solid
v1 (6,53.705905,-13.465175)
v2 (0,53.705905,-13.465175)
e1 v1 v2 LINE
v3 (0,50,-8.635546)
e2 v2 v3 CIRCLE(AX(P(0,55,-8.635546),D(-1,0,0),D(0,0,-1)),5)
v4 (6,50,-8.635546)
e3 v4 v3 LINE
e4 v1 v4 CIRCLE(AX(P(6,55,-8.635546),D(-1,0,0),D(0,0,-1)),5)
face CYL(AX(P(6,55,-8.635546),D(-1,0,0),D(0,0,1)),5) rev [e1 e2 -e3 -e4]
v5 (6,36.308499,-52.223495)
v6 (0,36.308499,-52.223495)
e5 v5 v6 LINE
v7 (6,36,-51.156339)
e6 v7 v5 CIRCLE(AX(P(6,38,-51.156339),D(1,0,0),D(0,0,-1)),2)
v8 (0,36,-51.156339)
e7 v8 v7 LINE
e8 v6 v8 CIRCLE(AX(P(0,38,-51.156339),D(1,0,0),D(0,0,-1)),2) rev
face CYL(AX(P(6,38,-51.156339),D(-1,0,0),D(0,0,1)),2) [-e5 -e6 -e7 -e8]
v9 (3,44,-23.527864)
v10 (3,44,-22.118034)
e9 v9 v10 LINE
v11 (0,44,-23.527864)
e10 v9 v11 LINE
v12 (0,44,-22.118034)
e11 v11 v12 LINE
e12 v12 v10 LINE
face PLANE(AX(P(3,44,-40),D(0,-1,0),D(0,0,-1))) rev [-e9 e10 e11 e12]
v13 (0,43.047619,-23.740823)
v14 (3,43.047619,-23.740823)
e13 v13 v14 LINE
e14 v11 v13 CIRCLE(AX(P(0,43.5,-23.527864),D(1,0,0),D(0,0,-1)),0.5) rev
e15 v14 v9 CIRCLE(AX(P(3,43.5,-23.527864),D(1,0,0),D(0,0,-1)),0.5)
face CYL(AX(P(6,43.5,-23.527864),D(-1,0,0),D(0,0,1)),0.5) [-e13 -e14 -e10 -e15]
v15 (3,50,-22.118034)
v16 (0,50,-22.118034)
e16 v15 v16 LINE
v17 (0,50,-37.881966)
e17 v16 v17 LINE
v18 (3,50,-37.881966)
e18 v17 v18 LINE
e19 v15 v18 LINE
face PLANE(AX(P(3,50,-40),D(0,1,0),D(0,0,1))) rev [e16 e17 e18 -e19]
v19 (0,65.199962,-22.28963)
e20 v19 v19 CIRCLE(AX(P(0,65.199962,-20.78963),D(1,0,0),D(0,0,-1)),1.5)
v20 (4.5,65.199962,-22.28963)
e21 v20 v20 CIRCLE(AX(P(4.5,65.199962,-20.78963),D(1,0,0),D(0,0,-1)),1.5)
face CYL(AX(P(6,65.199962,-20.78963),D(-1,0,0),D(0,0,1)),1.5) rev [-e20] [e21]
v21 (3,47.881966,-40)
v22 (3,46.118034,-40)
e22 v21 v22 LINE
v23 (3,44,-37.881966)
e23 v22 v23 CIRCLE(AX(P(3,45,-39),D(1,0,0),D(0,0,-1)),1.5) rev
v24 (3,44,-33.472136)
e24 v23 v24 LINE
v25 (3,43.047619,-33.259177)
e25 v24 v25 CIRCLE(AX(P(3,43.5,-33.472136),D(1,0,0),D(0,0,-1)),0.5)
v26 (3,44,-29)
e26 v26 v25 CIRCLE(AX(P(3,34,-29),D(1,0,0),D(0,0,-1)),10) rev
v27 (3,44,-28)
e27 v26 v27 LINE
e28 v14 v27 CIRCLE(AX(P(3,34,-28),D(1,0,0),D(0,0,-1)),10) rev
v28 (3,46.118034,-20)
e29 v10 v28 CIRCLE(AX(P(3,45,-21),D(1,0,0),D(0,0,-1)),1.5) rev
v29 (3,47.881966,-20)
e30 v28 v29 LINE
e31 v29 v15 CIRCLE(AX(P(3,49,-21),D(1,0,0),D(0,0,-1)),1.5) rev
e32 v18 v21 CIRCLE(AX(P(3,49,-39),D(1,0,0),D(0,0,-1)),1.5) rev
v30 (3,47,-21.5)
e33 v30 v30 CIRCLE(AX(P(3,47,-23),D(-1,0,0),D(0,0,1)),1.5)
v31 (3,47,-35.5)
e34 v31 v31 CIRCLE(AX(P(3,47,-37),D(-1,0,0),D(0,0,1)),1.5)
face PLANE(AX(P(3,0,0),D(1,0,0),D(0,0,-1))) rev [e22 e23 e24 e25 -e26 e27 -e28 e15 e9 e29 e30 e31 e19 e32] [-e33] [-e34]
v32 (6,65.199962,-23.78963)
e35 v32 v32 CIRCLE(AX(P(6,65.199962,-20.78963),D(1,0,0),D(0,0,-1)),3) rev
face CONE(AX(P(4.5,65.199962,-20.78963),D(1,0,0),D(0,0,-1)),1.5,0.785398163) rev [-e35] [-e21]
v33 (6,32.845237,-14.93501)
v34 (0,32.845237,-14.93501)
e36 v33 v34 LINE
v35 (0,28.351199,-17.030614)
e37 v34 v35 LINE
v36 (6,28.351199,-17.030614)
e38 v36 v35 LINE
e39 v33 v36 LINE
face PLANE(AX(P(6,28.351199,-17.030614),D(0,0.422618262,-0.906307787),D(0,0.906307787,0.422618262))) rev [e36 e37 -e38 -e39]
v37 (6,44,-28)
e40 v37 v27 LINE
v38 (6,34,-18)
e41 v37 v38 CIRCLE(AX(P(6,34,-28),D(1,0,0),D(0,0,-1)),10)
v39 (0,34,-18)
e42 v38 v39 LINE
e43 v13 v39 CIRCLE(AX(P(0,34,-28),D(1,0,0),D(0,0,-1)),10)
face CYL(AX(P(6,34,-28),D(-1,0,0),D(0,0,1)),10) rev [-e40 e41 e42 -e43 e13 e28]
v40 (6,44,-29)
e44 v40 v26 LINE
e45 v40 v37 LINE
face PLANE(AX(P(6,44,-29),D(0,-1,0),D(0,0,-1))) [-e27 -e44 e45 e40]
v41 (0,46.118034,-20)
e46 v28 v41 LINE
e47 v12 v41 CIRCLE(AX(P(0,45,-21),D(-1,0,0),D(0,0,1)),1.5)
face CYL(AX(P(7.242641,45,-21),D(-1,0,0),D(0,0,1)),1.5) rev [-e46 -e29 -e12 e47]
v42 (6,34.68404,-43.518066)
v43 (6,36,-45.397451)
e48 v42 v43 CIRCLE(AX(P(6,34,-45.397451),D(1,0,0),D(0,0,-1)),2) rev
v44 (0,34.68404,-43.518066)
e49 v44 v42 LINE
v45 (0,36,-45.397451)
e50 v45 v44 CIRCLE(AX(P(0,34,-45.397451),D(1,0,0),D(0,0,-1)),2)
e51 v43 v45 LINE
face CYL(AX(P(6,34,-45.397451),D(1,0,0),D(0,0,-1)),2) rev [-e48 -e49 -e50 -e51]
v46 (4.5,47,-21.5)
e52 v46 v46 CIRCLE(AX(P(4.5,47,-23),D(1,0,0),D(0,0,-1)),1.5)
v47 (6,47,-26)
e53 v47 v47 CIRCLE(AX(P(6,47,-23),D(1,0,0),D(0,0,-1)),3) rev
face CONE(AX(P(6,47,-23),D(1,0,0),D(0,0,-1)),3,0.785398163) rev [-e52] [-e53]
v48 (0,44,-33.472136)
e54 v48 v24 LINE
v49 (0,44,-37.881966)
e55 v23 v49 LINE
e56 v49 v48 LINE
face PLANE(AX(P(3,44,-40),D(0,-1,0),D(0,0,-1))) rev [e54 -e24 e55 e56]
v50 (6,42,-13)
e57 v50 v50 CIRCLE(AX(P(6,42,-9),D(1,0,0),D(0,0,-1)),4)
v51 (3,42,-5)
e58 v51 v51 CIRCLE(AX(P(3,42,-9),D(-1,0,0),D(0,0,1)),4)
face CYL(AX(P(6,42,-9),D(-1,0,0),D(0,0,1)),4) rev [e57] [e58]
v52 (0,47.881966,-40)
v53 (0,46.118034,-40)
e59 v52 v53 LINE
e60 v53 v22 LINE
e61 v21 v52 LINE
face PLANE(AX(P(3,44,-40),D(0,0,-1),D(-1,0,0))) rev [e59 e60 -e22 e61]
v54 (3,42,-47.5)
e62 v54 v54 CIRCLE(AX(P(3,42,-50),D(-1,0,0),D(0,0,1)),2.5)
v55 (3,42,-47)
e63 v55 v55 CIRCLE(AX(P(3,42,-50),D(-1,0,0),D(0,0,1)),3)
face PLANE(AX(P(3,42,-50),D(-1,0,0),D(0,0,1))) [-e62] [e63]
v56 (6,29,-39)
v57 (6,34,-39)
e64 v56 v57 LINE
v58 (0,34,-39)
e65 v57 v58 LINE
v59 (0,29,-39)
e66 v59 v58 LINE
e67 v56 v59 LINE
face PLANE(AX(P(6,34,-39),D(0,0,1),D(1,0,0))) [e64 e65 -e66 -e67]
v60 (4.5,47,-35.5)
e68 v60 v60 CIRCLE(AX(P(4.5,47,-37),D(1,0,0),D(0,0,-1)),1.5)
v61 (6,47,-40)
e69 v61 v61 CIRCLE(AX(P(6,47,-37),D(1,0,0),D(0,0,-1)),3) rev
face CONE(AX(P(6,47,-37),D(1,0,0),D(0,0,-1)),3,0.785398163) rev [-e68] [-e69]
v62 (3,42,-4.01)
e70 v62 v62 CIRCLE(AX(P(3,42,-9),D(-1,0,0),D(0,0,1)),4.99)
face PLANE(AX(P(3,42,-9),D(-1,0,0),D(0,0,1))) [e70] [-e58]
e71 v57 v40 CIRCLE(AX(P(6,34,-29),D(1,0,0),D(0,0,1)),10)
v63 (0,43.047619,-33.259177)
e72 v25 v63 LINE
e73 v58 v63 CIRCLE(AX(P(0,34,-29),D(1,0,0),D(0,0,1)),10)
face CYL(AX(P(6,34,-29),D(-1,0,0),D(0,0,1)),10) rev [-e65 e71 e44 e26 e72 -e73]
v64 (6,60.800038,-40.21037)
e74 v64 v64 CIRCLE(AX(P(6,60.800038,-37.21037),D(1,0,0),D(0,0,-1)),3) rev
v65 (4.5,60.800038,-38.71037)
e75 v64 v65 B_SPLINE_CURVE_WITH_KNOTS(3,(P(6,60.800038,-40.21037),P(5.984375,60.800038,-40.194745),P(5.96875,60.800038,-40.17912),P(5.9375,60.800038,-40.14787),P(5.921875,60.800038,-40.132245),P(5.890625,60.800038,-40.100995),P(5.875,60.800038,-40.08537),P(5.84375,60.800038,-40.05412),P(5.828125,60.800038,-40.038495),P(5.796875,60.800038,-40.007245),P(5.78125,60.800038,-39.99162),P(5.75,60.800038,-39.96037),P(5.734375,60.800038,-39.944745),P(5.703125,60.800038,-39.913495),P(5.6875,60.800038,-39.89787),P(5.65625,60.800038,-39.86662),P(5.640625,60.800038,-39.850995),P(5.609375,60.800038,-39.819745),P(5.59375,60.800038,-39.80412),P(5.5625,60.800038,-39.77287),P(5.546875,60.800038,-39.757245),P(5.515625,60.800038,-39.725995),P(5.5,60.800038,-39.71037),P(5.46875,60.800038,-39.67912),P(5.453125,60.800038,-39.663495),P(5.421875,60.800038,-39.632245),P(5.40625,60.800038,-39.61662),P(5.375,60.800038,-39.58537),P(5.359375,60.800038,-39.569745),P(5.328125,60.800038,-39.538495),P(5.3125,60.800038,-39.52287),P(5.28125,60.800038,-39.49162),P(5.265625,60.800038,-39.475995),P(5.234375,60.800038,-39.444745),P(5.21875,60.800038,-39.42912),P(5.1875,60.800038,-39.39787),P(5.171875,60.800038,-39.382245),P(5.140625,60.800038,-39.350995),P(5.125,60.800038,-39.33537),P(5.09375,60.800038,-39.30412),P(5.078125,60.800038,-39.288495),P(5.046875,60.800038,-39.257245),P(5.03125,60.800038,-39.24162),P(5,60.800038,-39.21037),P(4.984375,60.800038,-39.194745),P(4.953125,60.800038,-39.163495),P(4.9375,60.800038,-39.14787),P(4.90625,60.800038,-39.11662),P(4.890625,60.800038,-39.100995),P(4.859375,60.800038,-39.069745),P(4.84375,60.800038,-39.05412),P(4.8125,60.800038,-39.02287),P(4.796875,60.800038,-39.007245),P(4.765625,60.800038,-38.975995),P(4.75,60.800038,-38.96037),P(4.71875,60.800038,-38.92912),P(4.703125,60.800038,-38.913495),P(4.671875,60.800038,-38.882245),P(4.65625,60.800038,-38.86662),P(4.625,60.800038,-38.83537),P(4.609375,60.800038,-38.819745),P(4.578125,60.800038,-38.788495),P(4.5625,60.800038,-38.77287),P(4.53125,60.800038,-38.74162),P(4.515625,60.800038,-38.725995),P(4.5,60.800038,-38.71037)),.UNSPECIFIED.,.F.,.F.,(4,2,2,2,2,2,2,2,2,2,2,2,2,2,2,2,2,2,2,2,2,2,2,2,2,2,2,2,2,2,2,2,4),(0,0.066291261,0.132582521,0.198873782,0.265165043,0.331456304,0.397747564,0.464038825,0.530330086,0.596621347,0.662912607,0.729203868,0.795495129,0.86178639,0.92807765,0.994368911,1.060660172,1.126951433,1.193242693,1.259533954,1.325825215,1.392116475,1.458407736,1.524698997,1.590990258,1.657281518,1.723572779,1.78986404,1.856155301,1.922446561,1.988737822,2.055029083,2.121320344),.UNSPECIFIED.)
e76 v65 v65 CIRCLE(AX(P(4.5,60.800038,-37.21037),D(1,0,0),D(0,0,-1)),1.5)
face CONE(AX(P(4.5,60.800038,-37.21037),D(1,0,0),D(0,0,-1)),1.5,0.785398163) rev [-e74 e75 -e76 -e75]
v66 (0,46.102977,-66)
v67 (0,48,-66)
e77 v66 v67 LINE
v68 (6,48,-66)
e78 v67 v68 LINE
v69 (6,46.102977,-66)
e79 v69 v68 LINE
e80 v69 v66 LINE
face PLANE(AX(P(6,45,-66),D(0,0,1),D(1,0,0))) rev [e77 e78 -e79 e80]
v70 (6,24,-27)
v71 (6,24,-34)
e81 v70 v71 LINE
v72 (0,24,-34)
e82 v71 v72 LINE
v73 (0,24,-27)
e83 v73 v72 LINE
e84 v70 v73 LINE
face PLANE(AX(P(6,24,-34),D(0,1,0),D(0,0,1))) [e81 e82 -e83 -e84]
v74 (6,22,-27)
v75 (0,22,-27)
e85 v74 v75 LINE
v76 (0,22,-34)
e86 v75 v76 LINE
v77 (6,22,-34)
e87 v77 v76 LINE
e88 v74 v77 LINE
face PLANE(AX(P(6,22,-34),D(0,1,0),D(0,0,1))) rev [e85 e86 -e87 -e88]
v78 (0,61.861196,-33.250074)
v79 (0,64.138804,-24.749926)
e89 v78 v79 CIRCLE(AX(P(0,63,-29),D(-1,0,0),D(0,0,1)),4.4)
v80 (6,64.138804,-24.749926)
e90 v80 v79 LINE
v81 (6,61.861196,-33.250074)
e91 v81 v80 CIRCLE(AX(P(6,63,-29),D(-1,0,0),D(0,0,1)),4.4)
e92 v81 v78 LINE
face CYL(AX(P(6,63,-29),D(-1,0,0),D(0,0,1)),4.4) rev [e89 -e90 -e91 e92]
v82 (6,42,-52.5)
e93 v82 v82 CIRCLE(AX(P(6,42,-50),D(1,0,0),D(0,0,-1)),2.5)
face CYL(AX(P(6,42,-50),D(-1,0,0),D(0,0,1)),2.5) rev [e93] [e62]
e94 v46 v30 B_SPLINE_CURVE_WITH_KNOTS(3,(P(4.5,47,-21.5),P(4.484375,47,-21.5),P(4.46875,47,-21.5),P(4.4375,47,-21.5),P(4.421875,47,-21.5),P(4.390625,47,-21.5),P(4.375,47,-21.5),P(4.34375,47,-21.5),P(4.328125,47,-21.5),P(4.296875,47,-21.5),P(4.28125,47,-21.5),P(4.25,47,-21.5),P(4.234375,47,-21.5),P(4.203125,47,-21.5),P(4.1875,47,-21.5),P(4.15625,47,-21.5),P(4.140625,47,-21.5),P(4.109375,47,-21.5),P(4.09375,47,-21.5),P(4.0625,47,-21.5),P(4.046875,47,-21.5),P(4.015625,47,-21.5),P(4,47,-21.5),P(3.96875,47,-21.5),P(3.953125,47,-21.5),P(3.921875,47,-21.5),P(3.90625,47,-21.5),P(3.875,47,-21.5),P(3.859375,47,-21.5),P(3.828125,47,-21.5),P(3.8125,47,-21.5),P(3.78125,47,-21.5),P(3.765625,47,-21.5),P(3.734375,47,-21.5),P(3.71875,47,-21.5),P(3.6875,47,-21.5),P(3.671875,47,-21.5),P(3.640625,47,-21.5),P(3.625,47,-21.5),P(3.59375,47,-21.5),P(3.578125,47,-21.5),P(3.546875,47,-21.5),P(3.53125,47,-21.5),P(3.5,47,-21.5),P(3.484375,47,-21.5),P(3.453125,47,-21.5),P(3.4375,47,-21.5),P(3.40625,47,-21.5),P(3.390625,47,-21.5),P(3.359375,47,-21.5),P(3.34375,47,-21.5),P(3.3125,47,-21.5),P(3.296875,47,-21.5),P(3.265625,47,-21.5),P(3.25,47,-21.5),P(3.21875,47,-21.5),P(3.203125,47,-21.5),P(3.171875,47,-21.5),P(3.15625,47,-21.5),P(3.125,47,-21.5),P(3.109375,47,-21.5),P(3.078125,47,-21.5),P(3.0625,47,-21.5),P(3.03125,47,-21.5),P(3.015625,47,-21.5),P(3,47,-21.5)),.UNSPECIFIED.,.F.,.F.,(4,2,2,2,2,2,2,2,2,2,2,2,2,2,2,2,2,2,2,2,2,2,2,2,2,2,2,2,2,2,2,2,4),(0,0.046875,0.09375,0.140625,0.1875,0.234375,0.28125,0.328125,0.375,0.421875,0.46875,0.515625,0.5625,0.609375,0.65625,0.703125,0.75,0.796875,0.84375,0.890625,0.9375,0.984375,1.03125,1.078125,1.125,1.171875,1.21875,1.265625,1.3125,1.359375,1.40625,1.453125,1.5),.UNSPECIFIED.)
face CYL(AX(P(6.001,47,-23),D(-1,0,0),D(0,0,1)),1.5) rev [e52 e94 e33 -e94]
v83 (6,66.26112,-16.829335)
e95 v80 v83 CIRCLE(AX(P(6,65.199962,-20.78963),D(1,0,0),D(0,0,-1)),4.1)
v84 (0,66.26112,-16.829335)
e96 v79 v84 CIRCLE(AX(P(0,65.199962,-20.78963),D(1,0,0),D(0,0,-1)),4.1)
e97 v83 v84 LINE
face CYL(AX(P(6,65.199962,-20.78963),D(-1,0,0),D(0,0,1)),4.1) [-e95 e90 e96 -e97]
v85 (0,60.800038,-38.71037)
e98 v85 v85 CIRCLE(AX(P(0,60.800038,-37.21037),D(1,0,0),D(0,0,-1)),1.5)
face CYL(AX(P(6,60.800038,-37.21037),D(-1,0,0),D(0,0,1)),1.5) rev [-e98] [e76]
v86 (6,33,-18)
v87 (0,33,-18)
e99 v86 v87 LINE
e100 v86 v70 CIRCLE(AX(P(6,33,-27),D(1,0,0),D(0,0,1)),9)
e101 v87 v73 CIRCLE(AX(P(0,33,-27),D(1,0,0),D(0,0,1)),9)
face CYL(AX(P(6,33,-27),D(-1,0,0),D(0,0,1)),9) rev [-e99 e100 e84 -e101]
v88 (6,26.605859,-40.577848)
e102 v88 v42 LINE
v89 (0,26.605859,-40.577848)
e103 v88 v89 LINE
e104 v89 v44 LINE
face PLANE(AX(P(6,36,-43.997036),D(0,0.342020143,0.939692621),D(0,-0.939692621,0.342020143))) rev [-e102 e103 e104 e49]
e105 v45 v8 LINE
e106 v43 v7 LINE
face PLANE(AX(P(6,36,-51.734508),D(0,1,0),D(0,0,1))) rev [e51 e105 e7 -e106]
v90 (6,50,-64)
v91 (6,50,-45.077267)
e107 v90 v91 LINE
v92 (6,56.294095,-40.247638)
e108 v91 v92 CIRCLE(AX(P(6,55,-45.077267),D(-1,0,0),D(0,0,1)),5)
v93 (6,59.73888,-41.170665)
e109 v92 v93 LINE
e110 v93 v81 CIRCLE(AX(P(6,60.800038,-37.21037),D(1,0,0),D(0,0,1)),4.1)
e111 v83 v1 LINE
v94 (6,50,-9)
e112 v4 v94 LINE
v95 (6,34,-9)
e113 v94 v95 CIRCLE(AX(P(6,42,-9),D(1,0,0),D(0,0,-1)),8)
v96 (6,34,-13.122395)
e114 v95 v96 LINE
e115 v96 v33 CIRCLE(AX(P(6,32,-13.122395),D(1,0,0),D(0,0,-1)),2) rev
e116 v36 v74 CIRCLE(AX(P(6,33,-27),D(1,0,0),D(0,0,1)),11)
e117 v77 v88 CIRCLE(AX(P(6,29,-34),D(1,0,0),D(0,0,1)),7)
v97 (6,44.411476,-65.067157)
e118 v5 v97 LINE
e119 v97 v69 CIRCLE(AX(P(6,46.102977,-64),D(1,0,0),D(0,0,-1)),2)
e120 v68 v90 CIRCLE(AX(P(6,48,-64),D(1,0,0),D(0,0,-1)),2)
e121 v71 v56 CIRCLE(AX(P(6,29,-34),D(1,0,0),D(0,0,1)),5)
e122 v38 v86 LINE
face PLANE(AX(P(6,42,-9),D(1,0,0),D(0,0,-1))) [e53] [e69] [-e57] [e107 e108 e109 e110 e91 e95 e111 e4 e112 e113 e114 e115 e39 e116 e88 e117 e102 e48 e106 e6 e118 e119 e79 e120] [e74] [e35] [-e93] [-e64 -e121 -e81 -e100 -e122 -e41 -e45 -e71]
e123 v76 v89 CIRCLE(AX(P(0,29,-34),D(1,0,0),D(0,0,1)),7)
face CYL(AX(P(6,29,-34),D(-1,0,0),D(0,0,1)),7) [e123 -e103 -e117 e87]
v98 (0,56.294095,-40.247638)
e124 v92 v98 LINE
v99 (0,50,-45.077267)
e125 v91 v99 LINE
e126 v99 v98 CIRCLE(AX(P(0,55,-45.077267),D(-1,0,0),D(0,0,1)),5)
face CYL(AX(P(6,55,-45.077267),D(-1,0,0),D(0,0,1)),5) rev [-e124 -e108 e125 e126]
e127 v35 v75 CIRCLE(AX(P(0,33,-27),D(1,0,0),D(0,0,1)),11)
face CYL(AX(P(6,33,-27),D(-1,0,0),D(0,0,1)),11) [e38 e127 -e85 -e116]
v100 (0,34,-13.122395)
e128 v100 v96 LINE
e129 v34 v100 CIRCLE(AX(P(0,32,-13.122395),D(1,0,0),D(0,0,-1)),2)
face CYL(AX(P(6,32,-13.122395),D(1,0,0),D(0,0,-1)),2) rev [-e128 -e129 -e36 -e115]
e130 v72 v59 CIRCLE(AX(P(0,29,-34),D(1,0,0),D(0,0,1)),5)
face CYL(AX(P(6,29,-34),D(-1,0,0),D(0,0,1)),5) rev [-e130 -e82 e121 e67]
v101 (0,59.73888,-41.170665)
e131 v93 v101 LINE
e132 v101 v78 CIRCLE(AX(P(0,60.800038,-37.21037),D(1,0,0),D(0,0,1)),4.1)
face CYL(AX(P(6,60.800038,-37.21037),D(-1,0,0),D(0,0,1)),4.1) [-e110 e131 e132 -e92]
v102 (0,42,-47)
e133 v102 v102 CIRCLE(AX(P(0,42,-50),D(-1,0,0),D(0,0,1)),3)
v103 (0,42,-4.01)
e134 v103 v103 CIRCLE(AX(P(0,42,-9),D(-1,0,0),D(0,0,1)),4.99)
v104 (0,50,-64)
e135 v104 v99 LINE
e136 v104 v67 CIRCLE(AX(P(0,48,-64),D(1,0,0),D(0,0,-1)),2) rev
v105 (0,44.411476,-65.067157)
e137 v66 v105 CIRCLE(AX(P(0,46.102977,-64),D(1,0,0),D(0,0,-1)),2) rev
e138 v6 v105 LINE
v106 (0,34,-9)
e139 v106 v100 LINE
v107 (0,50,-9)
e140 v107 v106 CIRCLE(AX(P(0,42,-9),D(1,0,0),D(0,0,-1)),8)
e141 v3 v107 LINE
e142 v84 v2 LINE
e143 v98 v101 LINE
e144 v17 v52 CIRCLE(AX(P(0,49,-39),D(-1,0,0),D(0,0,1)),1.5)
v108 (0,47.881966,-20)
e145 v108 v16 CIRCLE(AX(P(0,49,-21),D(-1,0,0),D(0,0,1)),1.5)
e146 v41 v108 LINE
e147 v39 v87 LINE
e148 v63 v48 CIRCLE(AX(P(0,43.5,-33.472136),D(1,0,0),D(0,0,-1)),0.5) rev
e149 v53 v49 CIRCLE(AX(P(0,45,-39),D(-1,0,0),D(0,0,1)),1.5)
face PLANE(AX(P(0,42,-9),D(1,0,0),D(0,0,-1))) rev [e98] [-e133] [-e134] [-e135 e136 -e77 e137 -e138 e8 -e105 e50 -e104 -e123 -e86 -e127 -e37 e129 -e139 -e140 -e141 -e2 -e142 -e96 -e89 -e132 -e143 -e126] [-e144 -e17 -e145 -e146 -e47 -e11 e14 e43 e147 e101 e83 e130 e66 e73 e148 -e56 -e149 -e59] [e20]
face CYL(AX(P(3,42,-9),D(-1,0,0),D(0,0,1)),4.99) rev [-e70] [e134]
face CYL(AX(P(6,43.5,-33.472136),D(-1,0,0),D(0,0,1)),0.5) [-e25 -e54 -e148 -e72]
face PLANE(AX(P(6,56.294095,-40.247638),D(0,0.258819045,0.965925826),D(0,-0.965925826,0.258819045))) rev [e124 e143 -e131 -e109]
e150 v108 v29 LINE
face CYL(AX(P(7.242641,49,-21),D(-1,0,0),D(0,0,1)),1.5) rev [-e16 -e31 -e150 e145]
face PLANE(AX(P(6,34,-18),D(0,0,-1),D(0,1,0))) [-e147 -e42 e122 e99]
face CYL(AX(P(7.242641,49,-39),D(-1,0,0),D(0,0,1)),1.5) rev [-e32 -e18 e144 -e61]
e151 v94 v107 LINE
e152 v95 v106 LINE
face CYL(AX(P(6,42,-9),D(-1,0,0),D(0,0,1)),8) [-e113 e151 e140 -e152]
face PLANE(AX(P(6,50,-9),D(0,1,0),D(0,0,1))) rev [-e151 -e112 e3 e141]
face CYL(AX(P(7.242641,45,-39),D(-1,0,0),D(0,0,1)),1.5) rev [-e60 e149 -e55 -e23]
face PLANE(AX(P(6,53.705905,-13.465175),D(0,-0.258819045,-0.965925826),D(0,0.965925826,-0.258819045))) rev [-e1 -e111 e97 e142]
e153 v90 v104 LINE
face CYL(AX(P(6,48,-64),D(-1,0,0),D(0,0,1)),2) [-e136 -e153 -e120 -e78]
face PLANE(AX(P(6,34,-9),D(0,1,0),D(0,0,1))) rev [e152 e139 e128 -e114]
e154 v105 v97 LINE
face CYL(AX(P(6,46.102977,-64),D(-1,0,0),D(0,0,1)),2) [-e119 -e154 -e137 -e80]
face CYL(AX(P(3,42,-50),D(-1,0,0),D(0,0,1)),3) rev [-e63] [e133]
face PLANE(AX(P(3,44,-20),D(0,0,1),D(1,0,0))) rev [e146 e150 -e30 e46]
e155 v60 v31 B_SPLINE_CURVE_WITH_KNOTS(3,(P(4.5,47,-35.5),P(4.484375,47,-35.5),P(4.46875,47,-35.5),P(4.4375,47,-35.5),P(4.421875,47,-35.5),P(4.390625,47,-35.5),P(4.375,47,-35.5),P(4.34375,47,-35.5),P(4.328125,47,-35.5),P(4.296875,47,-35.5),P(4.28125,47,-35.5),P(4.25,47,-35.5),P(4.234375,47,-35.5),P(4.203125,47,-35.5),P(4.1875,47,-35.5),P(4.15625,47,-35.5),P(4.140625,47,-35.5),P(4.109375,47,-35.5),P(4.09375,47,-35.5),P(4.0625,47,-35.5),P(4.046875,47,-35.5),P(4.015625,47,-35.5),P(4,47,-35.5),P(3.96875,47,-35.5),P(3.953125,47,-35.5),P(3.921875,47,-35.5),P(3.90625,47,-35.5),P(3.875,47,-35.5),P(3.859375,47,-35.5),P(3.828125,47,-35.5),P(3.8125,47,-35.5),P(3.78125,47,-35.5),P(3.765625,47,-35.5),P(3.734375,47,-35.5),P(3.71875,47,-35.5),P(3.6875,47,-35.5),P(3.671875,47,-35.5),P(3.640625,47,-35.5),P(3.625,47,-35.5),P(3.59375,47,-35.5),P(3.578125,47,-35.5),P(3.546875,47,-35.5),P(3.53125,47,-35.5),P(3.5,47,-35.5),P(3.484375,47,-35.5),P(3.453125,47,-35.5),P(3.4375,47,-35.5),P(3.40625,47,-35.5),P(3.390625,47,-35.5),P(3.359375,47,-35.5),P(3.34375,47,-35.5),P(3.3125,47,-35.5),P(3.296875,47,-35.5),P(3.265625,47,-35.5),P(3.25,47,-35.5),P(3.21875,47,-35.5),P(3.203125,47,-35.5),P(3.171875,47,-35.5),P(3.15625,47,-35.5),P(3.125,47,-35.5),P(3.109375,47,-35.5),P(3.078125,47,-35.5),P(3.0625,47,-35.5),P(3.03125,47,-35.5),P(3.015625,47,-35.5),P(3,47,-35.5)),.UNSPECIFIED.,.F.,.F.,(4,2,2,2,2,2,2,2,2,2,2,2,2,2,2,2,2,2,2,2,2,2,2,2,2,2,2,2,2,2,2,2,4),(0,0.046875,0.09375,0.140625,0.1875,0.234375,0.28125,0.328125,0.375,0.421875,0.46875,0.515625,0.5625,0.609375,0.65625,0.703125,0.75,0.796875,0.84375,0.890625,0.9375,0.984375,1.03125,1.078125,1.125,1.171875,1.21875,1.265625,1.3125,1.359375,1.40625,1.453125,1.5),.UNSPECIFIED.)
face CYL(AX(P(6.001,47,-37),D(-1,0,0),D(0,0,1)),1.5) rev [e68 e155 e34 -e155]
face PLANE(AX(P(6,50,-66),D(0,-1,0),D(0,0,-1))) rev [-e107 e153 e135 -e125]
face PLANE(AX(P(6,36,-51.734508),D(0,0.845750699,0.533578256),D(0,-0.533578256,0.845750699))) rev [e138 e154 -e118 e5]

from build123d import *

# Parameters (mm, degrees)
SKETCH27_R          = 4
SKETCH27_R_2        = 2.5
SKETCH27_R_3        = 1.5
BOSS_EXTRUDE1_DEPTH = 6
SKETCH47_R          = 4.99
CUT_EXTRUDE8_DEPTH  = 3
SKETCH49_W          = 20
SKETCH49_H          = 6
CUT_EXTRUDE11_DEPTH = 3
CUT_EXTRUDE13_REACH = 97.747
SKETCH51_R          = 1.5
FILLET3_R           = 2
CHAMFER1_SIZE       = 1.5
FILLET5_START       = -1
FILLET5_DEPTH       = 4
SKETCH52_R          = 3
CUT_EXTRUDE14_DEPTH = 3
SKETCH53_R          = 1.5
CUT_EXTRUDE15_DEPTH = 3


with BuildPart() as part:
    # Sketch27 → Boss-Extrude1 (new body)
    with BuildSketch(Plane(origin=(0, 0, 0), x_dir=(0, 0, -1), z_dir=(1, 0, 0))):
        with BuildLine():
            Line((9, 50), (8.635545685, 50))
            ThreePointArc((8.635545685, 50), (11.67935283, 51.033233299), (13.465174817, 53.705904774))
            Line((13.465174817, 53.705904774), (16.829334589, 66.261119968))
            ThreePointArc((16.829334589, 66.261119968), (21.850788561, 69.160257771), (24.749926364, 64.138803798))
            ThreePointArc((24.749926364, 64.138803798), (27.861196202, 58.749926364), (33.250073636, 61.861196202))
            ThreePointArc((33.250073636, 61.861196202), (38.271527608, 64.760334004), (41.170665411, 59.738880032))
            Line((41.170665411, 59.738880032), (40.247638104, 56.294095226))
            ThreePointArc((40.247638104, 56.294095226), (41.110500534, 51.956192855), (45.077267236, 50))
            Line((45.077267236, 50), (66, 50))
            Line((66, 50), (66, 45))
            Line((66, 45), (51.734508099, 36))
            Line((51.734508099, 36), (43.997036047, 36))
            Line((43.997036047, 36), (40.577848346, 26.605858997))
            ThreePointArc((40.577848346, 26.605858997), (38.015035054, 23.26593569), (34, 22))
            Line((34, 22), (27, 22))
            ThreePointArc((27, 22), (21.089704308, 23.722694096), (17.030614343, 28.351199121))
            Line((17.030614343, 28.351199121), (14.396535233, 34))
            Line((14.396535233, 34), (9, 34))
            ThreePointArc((9, 34), (1, 42), (9, 50))
        make_face()
        with Locations((9, 42)):
            Circle(SKETCH27_R, mode=Mode.SUBTRACT)
        with Locations((50, 42)):
            Circle(SKETCH27_R_2, mode=Mode.SUBTRACT)
        with Locations((37.210369523, 60.800038117)):
            Circle(SKETCH27_R_3, mode=Mode.SUBTRACT)
        with Locations((20.789630477, 65.199961883)):
            Circle(SKETCH27_R_3, mode=Mode.SUBTRACT)
        with BuildLine():
            Line((29, 44), (28, 44))
            ThreePointArc((28, 44), (20.928932188, 41.071067812), (18, 34))
            Line((18, 34), (18, 33))
            ThreePointArc((18, 33), (20.636038969, 26.636038969), (27, 24))
            Line((27, 24), (34, 24))
            ThreePointArc((34, 24), (37.535533906, 25.464466094), (39, 29))
            Line((39, 29), (39, 34))
            ThreePointArc((39, 34), (36.071067812, 41.071067812), (29, 44))
        make_face(mode=Mode.SUBTRACT)
    extrude(amount=BOSS_EXTRUDE1_DEPTH)

    # Sketch47 → Cut-Extrude8 (cut)
    with BuildSketch(Plane.ZY):
        with Locations((-9, 42)):
            Circle(SKETCH47_R)
    extrude(amount=-CUT_EXTRUDE8_DEPTH, mode=Mode.SUBTRACT)

    # Sketch49 → Cut-Extrude11 (cut)
    with BuildSketch(Plane.ZY):
        with Locations((-30, 47)):
            Rectangle(SKETCH49_W, SKETCH49_H)
    extrude(amount=-CUT_EXTRUDE11_DEPTH, mode=Mode.SUBTRACT)

    # Sketch51 → Cut-Extrude13 (cut, up to next)
    with BuildSketch(Plane.ZY.offset(-3), mode=Mode.PRIVATE) as cut_extrude13_sk1:
        with Locations((-37, 47)):
            Circle(SKETCH51_R)
    cut_extrude13_tool1 = extrude(cut_extrude13_sk1.sketch, amount=-CUT_EXTRUDE13_REACH, mode=Mode.PRIVATE) & part.part
    # Sketch51 → Cut-Extrude13 (cut, up to next)
    with BuildSketch(Plane.ZY.offset(-3), mode=Mode.PRIVATE) as cut_extrude13_sk2:
        with Locations((-23, 47)):
            Circle(SKETCH51_R)
    cut_extrude13_tool2 = extrude(cut_extrude13_sk2.sketch, amount=-CUT_EXTRUDE13_REACH, mode=Mode.PRIVATE) & part.part
    add(cut_extrude13_tool1.solids().sort_by_distance((3, 47, -37))[0], mode=Mode.SUBTRACT)
    add(cut_extrude13_tool2.solids().sort_by_distance((3, 47, -23))[0], mode=Mode.SUBTRACT)

    # Fillet3
    fillet3_edges = [part.edges().sort_by_distance(p)[0] for p in [
        (3, 50, -66),
        (3, 45, -66),
        (3, 36, -51.734508099),
        (3, 36, -43.997036047),
        (3, 34, -14.396535233),
    ]]
    fillet(fillet3_edges, radius=FILLET3_R)

    # Chamfer1
    chamfer1_edges = [part.edges().sort_by_distance(p)[0] for p in [
        (6, 47, -38.5),
        (6, 47, -24.5),
        (6, 60.800038117, -35.710369523),
        (6, 65.199961883, -19.289630477),
    ]]
    chamfer(chamfer1_edges, length=CHAMFER1_SIZE)

    # Fillet5: read off the stored shape, not the designer's step
    # Fillet5 outline → Fillet5 (cut)
    with BuildSketch(Plane.YZ.offset(FILLET5_START)):
        with BuildLine():
            Line((44, -28), (44, -23.527864045))
            ThreePointArc((44, -23.527864045), (43.609108945, -24.015814081), (43.047619048, -23.7408229))
            ThreePointArc((43.047619048, -23.7408229), (43.75900073, -25.817821098), (44, -28))
        make_face()
        with BuildLine():
            ThreePointArc((44, -29), (43.75900073, -31.182178902), (43.047619048, -33.2591771))
            ThreePointArc((43.047619048, -33.2591771), (43.609108945, -32.984185919), (44, -33.472135955))
            Line((44, -33.472135955), (44, -29))
        make_face()
    extrude(amount=FILLET5_DEPTH, mode=Mode.SUBTRACT)

    # Sketch52 → Cut-Extrude14 (cut)
    with BuildSketch(Plane.ZY):
        with Locations((-50, 42)):
            Circle(SKETCH52_R)
    extrude(amount=-CUT_EXTRUDE14_DEPTH, mode=Mode.SUBTRACT)

    # Sketch53 → Cut-Extrude15 (cut)
    with BuildSketch(Plane.ZY):
        with Locations((-39, 49)):
            Circle(SKETCH53_R)
        with Locations((-21, 49)):
            Circle(SKETCH53_R)
        with Locations((-21, 45)):
            Circle(SKETCH53_R)
        with Locations((-39, 45)):
            Circle(SKETCH53_R)
    extrude(amount=-CUT_EXTRUDE15_DEPTH, mode=Mode.SUBTRACT)


solid = part.part
